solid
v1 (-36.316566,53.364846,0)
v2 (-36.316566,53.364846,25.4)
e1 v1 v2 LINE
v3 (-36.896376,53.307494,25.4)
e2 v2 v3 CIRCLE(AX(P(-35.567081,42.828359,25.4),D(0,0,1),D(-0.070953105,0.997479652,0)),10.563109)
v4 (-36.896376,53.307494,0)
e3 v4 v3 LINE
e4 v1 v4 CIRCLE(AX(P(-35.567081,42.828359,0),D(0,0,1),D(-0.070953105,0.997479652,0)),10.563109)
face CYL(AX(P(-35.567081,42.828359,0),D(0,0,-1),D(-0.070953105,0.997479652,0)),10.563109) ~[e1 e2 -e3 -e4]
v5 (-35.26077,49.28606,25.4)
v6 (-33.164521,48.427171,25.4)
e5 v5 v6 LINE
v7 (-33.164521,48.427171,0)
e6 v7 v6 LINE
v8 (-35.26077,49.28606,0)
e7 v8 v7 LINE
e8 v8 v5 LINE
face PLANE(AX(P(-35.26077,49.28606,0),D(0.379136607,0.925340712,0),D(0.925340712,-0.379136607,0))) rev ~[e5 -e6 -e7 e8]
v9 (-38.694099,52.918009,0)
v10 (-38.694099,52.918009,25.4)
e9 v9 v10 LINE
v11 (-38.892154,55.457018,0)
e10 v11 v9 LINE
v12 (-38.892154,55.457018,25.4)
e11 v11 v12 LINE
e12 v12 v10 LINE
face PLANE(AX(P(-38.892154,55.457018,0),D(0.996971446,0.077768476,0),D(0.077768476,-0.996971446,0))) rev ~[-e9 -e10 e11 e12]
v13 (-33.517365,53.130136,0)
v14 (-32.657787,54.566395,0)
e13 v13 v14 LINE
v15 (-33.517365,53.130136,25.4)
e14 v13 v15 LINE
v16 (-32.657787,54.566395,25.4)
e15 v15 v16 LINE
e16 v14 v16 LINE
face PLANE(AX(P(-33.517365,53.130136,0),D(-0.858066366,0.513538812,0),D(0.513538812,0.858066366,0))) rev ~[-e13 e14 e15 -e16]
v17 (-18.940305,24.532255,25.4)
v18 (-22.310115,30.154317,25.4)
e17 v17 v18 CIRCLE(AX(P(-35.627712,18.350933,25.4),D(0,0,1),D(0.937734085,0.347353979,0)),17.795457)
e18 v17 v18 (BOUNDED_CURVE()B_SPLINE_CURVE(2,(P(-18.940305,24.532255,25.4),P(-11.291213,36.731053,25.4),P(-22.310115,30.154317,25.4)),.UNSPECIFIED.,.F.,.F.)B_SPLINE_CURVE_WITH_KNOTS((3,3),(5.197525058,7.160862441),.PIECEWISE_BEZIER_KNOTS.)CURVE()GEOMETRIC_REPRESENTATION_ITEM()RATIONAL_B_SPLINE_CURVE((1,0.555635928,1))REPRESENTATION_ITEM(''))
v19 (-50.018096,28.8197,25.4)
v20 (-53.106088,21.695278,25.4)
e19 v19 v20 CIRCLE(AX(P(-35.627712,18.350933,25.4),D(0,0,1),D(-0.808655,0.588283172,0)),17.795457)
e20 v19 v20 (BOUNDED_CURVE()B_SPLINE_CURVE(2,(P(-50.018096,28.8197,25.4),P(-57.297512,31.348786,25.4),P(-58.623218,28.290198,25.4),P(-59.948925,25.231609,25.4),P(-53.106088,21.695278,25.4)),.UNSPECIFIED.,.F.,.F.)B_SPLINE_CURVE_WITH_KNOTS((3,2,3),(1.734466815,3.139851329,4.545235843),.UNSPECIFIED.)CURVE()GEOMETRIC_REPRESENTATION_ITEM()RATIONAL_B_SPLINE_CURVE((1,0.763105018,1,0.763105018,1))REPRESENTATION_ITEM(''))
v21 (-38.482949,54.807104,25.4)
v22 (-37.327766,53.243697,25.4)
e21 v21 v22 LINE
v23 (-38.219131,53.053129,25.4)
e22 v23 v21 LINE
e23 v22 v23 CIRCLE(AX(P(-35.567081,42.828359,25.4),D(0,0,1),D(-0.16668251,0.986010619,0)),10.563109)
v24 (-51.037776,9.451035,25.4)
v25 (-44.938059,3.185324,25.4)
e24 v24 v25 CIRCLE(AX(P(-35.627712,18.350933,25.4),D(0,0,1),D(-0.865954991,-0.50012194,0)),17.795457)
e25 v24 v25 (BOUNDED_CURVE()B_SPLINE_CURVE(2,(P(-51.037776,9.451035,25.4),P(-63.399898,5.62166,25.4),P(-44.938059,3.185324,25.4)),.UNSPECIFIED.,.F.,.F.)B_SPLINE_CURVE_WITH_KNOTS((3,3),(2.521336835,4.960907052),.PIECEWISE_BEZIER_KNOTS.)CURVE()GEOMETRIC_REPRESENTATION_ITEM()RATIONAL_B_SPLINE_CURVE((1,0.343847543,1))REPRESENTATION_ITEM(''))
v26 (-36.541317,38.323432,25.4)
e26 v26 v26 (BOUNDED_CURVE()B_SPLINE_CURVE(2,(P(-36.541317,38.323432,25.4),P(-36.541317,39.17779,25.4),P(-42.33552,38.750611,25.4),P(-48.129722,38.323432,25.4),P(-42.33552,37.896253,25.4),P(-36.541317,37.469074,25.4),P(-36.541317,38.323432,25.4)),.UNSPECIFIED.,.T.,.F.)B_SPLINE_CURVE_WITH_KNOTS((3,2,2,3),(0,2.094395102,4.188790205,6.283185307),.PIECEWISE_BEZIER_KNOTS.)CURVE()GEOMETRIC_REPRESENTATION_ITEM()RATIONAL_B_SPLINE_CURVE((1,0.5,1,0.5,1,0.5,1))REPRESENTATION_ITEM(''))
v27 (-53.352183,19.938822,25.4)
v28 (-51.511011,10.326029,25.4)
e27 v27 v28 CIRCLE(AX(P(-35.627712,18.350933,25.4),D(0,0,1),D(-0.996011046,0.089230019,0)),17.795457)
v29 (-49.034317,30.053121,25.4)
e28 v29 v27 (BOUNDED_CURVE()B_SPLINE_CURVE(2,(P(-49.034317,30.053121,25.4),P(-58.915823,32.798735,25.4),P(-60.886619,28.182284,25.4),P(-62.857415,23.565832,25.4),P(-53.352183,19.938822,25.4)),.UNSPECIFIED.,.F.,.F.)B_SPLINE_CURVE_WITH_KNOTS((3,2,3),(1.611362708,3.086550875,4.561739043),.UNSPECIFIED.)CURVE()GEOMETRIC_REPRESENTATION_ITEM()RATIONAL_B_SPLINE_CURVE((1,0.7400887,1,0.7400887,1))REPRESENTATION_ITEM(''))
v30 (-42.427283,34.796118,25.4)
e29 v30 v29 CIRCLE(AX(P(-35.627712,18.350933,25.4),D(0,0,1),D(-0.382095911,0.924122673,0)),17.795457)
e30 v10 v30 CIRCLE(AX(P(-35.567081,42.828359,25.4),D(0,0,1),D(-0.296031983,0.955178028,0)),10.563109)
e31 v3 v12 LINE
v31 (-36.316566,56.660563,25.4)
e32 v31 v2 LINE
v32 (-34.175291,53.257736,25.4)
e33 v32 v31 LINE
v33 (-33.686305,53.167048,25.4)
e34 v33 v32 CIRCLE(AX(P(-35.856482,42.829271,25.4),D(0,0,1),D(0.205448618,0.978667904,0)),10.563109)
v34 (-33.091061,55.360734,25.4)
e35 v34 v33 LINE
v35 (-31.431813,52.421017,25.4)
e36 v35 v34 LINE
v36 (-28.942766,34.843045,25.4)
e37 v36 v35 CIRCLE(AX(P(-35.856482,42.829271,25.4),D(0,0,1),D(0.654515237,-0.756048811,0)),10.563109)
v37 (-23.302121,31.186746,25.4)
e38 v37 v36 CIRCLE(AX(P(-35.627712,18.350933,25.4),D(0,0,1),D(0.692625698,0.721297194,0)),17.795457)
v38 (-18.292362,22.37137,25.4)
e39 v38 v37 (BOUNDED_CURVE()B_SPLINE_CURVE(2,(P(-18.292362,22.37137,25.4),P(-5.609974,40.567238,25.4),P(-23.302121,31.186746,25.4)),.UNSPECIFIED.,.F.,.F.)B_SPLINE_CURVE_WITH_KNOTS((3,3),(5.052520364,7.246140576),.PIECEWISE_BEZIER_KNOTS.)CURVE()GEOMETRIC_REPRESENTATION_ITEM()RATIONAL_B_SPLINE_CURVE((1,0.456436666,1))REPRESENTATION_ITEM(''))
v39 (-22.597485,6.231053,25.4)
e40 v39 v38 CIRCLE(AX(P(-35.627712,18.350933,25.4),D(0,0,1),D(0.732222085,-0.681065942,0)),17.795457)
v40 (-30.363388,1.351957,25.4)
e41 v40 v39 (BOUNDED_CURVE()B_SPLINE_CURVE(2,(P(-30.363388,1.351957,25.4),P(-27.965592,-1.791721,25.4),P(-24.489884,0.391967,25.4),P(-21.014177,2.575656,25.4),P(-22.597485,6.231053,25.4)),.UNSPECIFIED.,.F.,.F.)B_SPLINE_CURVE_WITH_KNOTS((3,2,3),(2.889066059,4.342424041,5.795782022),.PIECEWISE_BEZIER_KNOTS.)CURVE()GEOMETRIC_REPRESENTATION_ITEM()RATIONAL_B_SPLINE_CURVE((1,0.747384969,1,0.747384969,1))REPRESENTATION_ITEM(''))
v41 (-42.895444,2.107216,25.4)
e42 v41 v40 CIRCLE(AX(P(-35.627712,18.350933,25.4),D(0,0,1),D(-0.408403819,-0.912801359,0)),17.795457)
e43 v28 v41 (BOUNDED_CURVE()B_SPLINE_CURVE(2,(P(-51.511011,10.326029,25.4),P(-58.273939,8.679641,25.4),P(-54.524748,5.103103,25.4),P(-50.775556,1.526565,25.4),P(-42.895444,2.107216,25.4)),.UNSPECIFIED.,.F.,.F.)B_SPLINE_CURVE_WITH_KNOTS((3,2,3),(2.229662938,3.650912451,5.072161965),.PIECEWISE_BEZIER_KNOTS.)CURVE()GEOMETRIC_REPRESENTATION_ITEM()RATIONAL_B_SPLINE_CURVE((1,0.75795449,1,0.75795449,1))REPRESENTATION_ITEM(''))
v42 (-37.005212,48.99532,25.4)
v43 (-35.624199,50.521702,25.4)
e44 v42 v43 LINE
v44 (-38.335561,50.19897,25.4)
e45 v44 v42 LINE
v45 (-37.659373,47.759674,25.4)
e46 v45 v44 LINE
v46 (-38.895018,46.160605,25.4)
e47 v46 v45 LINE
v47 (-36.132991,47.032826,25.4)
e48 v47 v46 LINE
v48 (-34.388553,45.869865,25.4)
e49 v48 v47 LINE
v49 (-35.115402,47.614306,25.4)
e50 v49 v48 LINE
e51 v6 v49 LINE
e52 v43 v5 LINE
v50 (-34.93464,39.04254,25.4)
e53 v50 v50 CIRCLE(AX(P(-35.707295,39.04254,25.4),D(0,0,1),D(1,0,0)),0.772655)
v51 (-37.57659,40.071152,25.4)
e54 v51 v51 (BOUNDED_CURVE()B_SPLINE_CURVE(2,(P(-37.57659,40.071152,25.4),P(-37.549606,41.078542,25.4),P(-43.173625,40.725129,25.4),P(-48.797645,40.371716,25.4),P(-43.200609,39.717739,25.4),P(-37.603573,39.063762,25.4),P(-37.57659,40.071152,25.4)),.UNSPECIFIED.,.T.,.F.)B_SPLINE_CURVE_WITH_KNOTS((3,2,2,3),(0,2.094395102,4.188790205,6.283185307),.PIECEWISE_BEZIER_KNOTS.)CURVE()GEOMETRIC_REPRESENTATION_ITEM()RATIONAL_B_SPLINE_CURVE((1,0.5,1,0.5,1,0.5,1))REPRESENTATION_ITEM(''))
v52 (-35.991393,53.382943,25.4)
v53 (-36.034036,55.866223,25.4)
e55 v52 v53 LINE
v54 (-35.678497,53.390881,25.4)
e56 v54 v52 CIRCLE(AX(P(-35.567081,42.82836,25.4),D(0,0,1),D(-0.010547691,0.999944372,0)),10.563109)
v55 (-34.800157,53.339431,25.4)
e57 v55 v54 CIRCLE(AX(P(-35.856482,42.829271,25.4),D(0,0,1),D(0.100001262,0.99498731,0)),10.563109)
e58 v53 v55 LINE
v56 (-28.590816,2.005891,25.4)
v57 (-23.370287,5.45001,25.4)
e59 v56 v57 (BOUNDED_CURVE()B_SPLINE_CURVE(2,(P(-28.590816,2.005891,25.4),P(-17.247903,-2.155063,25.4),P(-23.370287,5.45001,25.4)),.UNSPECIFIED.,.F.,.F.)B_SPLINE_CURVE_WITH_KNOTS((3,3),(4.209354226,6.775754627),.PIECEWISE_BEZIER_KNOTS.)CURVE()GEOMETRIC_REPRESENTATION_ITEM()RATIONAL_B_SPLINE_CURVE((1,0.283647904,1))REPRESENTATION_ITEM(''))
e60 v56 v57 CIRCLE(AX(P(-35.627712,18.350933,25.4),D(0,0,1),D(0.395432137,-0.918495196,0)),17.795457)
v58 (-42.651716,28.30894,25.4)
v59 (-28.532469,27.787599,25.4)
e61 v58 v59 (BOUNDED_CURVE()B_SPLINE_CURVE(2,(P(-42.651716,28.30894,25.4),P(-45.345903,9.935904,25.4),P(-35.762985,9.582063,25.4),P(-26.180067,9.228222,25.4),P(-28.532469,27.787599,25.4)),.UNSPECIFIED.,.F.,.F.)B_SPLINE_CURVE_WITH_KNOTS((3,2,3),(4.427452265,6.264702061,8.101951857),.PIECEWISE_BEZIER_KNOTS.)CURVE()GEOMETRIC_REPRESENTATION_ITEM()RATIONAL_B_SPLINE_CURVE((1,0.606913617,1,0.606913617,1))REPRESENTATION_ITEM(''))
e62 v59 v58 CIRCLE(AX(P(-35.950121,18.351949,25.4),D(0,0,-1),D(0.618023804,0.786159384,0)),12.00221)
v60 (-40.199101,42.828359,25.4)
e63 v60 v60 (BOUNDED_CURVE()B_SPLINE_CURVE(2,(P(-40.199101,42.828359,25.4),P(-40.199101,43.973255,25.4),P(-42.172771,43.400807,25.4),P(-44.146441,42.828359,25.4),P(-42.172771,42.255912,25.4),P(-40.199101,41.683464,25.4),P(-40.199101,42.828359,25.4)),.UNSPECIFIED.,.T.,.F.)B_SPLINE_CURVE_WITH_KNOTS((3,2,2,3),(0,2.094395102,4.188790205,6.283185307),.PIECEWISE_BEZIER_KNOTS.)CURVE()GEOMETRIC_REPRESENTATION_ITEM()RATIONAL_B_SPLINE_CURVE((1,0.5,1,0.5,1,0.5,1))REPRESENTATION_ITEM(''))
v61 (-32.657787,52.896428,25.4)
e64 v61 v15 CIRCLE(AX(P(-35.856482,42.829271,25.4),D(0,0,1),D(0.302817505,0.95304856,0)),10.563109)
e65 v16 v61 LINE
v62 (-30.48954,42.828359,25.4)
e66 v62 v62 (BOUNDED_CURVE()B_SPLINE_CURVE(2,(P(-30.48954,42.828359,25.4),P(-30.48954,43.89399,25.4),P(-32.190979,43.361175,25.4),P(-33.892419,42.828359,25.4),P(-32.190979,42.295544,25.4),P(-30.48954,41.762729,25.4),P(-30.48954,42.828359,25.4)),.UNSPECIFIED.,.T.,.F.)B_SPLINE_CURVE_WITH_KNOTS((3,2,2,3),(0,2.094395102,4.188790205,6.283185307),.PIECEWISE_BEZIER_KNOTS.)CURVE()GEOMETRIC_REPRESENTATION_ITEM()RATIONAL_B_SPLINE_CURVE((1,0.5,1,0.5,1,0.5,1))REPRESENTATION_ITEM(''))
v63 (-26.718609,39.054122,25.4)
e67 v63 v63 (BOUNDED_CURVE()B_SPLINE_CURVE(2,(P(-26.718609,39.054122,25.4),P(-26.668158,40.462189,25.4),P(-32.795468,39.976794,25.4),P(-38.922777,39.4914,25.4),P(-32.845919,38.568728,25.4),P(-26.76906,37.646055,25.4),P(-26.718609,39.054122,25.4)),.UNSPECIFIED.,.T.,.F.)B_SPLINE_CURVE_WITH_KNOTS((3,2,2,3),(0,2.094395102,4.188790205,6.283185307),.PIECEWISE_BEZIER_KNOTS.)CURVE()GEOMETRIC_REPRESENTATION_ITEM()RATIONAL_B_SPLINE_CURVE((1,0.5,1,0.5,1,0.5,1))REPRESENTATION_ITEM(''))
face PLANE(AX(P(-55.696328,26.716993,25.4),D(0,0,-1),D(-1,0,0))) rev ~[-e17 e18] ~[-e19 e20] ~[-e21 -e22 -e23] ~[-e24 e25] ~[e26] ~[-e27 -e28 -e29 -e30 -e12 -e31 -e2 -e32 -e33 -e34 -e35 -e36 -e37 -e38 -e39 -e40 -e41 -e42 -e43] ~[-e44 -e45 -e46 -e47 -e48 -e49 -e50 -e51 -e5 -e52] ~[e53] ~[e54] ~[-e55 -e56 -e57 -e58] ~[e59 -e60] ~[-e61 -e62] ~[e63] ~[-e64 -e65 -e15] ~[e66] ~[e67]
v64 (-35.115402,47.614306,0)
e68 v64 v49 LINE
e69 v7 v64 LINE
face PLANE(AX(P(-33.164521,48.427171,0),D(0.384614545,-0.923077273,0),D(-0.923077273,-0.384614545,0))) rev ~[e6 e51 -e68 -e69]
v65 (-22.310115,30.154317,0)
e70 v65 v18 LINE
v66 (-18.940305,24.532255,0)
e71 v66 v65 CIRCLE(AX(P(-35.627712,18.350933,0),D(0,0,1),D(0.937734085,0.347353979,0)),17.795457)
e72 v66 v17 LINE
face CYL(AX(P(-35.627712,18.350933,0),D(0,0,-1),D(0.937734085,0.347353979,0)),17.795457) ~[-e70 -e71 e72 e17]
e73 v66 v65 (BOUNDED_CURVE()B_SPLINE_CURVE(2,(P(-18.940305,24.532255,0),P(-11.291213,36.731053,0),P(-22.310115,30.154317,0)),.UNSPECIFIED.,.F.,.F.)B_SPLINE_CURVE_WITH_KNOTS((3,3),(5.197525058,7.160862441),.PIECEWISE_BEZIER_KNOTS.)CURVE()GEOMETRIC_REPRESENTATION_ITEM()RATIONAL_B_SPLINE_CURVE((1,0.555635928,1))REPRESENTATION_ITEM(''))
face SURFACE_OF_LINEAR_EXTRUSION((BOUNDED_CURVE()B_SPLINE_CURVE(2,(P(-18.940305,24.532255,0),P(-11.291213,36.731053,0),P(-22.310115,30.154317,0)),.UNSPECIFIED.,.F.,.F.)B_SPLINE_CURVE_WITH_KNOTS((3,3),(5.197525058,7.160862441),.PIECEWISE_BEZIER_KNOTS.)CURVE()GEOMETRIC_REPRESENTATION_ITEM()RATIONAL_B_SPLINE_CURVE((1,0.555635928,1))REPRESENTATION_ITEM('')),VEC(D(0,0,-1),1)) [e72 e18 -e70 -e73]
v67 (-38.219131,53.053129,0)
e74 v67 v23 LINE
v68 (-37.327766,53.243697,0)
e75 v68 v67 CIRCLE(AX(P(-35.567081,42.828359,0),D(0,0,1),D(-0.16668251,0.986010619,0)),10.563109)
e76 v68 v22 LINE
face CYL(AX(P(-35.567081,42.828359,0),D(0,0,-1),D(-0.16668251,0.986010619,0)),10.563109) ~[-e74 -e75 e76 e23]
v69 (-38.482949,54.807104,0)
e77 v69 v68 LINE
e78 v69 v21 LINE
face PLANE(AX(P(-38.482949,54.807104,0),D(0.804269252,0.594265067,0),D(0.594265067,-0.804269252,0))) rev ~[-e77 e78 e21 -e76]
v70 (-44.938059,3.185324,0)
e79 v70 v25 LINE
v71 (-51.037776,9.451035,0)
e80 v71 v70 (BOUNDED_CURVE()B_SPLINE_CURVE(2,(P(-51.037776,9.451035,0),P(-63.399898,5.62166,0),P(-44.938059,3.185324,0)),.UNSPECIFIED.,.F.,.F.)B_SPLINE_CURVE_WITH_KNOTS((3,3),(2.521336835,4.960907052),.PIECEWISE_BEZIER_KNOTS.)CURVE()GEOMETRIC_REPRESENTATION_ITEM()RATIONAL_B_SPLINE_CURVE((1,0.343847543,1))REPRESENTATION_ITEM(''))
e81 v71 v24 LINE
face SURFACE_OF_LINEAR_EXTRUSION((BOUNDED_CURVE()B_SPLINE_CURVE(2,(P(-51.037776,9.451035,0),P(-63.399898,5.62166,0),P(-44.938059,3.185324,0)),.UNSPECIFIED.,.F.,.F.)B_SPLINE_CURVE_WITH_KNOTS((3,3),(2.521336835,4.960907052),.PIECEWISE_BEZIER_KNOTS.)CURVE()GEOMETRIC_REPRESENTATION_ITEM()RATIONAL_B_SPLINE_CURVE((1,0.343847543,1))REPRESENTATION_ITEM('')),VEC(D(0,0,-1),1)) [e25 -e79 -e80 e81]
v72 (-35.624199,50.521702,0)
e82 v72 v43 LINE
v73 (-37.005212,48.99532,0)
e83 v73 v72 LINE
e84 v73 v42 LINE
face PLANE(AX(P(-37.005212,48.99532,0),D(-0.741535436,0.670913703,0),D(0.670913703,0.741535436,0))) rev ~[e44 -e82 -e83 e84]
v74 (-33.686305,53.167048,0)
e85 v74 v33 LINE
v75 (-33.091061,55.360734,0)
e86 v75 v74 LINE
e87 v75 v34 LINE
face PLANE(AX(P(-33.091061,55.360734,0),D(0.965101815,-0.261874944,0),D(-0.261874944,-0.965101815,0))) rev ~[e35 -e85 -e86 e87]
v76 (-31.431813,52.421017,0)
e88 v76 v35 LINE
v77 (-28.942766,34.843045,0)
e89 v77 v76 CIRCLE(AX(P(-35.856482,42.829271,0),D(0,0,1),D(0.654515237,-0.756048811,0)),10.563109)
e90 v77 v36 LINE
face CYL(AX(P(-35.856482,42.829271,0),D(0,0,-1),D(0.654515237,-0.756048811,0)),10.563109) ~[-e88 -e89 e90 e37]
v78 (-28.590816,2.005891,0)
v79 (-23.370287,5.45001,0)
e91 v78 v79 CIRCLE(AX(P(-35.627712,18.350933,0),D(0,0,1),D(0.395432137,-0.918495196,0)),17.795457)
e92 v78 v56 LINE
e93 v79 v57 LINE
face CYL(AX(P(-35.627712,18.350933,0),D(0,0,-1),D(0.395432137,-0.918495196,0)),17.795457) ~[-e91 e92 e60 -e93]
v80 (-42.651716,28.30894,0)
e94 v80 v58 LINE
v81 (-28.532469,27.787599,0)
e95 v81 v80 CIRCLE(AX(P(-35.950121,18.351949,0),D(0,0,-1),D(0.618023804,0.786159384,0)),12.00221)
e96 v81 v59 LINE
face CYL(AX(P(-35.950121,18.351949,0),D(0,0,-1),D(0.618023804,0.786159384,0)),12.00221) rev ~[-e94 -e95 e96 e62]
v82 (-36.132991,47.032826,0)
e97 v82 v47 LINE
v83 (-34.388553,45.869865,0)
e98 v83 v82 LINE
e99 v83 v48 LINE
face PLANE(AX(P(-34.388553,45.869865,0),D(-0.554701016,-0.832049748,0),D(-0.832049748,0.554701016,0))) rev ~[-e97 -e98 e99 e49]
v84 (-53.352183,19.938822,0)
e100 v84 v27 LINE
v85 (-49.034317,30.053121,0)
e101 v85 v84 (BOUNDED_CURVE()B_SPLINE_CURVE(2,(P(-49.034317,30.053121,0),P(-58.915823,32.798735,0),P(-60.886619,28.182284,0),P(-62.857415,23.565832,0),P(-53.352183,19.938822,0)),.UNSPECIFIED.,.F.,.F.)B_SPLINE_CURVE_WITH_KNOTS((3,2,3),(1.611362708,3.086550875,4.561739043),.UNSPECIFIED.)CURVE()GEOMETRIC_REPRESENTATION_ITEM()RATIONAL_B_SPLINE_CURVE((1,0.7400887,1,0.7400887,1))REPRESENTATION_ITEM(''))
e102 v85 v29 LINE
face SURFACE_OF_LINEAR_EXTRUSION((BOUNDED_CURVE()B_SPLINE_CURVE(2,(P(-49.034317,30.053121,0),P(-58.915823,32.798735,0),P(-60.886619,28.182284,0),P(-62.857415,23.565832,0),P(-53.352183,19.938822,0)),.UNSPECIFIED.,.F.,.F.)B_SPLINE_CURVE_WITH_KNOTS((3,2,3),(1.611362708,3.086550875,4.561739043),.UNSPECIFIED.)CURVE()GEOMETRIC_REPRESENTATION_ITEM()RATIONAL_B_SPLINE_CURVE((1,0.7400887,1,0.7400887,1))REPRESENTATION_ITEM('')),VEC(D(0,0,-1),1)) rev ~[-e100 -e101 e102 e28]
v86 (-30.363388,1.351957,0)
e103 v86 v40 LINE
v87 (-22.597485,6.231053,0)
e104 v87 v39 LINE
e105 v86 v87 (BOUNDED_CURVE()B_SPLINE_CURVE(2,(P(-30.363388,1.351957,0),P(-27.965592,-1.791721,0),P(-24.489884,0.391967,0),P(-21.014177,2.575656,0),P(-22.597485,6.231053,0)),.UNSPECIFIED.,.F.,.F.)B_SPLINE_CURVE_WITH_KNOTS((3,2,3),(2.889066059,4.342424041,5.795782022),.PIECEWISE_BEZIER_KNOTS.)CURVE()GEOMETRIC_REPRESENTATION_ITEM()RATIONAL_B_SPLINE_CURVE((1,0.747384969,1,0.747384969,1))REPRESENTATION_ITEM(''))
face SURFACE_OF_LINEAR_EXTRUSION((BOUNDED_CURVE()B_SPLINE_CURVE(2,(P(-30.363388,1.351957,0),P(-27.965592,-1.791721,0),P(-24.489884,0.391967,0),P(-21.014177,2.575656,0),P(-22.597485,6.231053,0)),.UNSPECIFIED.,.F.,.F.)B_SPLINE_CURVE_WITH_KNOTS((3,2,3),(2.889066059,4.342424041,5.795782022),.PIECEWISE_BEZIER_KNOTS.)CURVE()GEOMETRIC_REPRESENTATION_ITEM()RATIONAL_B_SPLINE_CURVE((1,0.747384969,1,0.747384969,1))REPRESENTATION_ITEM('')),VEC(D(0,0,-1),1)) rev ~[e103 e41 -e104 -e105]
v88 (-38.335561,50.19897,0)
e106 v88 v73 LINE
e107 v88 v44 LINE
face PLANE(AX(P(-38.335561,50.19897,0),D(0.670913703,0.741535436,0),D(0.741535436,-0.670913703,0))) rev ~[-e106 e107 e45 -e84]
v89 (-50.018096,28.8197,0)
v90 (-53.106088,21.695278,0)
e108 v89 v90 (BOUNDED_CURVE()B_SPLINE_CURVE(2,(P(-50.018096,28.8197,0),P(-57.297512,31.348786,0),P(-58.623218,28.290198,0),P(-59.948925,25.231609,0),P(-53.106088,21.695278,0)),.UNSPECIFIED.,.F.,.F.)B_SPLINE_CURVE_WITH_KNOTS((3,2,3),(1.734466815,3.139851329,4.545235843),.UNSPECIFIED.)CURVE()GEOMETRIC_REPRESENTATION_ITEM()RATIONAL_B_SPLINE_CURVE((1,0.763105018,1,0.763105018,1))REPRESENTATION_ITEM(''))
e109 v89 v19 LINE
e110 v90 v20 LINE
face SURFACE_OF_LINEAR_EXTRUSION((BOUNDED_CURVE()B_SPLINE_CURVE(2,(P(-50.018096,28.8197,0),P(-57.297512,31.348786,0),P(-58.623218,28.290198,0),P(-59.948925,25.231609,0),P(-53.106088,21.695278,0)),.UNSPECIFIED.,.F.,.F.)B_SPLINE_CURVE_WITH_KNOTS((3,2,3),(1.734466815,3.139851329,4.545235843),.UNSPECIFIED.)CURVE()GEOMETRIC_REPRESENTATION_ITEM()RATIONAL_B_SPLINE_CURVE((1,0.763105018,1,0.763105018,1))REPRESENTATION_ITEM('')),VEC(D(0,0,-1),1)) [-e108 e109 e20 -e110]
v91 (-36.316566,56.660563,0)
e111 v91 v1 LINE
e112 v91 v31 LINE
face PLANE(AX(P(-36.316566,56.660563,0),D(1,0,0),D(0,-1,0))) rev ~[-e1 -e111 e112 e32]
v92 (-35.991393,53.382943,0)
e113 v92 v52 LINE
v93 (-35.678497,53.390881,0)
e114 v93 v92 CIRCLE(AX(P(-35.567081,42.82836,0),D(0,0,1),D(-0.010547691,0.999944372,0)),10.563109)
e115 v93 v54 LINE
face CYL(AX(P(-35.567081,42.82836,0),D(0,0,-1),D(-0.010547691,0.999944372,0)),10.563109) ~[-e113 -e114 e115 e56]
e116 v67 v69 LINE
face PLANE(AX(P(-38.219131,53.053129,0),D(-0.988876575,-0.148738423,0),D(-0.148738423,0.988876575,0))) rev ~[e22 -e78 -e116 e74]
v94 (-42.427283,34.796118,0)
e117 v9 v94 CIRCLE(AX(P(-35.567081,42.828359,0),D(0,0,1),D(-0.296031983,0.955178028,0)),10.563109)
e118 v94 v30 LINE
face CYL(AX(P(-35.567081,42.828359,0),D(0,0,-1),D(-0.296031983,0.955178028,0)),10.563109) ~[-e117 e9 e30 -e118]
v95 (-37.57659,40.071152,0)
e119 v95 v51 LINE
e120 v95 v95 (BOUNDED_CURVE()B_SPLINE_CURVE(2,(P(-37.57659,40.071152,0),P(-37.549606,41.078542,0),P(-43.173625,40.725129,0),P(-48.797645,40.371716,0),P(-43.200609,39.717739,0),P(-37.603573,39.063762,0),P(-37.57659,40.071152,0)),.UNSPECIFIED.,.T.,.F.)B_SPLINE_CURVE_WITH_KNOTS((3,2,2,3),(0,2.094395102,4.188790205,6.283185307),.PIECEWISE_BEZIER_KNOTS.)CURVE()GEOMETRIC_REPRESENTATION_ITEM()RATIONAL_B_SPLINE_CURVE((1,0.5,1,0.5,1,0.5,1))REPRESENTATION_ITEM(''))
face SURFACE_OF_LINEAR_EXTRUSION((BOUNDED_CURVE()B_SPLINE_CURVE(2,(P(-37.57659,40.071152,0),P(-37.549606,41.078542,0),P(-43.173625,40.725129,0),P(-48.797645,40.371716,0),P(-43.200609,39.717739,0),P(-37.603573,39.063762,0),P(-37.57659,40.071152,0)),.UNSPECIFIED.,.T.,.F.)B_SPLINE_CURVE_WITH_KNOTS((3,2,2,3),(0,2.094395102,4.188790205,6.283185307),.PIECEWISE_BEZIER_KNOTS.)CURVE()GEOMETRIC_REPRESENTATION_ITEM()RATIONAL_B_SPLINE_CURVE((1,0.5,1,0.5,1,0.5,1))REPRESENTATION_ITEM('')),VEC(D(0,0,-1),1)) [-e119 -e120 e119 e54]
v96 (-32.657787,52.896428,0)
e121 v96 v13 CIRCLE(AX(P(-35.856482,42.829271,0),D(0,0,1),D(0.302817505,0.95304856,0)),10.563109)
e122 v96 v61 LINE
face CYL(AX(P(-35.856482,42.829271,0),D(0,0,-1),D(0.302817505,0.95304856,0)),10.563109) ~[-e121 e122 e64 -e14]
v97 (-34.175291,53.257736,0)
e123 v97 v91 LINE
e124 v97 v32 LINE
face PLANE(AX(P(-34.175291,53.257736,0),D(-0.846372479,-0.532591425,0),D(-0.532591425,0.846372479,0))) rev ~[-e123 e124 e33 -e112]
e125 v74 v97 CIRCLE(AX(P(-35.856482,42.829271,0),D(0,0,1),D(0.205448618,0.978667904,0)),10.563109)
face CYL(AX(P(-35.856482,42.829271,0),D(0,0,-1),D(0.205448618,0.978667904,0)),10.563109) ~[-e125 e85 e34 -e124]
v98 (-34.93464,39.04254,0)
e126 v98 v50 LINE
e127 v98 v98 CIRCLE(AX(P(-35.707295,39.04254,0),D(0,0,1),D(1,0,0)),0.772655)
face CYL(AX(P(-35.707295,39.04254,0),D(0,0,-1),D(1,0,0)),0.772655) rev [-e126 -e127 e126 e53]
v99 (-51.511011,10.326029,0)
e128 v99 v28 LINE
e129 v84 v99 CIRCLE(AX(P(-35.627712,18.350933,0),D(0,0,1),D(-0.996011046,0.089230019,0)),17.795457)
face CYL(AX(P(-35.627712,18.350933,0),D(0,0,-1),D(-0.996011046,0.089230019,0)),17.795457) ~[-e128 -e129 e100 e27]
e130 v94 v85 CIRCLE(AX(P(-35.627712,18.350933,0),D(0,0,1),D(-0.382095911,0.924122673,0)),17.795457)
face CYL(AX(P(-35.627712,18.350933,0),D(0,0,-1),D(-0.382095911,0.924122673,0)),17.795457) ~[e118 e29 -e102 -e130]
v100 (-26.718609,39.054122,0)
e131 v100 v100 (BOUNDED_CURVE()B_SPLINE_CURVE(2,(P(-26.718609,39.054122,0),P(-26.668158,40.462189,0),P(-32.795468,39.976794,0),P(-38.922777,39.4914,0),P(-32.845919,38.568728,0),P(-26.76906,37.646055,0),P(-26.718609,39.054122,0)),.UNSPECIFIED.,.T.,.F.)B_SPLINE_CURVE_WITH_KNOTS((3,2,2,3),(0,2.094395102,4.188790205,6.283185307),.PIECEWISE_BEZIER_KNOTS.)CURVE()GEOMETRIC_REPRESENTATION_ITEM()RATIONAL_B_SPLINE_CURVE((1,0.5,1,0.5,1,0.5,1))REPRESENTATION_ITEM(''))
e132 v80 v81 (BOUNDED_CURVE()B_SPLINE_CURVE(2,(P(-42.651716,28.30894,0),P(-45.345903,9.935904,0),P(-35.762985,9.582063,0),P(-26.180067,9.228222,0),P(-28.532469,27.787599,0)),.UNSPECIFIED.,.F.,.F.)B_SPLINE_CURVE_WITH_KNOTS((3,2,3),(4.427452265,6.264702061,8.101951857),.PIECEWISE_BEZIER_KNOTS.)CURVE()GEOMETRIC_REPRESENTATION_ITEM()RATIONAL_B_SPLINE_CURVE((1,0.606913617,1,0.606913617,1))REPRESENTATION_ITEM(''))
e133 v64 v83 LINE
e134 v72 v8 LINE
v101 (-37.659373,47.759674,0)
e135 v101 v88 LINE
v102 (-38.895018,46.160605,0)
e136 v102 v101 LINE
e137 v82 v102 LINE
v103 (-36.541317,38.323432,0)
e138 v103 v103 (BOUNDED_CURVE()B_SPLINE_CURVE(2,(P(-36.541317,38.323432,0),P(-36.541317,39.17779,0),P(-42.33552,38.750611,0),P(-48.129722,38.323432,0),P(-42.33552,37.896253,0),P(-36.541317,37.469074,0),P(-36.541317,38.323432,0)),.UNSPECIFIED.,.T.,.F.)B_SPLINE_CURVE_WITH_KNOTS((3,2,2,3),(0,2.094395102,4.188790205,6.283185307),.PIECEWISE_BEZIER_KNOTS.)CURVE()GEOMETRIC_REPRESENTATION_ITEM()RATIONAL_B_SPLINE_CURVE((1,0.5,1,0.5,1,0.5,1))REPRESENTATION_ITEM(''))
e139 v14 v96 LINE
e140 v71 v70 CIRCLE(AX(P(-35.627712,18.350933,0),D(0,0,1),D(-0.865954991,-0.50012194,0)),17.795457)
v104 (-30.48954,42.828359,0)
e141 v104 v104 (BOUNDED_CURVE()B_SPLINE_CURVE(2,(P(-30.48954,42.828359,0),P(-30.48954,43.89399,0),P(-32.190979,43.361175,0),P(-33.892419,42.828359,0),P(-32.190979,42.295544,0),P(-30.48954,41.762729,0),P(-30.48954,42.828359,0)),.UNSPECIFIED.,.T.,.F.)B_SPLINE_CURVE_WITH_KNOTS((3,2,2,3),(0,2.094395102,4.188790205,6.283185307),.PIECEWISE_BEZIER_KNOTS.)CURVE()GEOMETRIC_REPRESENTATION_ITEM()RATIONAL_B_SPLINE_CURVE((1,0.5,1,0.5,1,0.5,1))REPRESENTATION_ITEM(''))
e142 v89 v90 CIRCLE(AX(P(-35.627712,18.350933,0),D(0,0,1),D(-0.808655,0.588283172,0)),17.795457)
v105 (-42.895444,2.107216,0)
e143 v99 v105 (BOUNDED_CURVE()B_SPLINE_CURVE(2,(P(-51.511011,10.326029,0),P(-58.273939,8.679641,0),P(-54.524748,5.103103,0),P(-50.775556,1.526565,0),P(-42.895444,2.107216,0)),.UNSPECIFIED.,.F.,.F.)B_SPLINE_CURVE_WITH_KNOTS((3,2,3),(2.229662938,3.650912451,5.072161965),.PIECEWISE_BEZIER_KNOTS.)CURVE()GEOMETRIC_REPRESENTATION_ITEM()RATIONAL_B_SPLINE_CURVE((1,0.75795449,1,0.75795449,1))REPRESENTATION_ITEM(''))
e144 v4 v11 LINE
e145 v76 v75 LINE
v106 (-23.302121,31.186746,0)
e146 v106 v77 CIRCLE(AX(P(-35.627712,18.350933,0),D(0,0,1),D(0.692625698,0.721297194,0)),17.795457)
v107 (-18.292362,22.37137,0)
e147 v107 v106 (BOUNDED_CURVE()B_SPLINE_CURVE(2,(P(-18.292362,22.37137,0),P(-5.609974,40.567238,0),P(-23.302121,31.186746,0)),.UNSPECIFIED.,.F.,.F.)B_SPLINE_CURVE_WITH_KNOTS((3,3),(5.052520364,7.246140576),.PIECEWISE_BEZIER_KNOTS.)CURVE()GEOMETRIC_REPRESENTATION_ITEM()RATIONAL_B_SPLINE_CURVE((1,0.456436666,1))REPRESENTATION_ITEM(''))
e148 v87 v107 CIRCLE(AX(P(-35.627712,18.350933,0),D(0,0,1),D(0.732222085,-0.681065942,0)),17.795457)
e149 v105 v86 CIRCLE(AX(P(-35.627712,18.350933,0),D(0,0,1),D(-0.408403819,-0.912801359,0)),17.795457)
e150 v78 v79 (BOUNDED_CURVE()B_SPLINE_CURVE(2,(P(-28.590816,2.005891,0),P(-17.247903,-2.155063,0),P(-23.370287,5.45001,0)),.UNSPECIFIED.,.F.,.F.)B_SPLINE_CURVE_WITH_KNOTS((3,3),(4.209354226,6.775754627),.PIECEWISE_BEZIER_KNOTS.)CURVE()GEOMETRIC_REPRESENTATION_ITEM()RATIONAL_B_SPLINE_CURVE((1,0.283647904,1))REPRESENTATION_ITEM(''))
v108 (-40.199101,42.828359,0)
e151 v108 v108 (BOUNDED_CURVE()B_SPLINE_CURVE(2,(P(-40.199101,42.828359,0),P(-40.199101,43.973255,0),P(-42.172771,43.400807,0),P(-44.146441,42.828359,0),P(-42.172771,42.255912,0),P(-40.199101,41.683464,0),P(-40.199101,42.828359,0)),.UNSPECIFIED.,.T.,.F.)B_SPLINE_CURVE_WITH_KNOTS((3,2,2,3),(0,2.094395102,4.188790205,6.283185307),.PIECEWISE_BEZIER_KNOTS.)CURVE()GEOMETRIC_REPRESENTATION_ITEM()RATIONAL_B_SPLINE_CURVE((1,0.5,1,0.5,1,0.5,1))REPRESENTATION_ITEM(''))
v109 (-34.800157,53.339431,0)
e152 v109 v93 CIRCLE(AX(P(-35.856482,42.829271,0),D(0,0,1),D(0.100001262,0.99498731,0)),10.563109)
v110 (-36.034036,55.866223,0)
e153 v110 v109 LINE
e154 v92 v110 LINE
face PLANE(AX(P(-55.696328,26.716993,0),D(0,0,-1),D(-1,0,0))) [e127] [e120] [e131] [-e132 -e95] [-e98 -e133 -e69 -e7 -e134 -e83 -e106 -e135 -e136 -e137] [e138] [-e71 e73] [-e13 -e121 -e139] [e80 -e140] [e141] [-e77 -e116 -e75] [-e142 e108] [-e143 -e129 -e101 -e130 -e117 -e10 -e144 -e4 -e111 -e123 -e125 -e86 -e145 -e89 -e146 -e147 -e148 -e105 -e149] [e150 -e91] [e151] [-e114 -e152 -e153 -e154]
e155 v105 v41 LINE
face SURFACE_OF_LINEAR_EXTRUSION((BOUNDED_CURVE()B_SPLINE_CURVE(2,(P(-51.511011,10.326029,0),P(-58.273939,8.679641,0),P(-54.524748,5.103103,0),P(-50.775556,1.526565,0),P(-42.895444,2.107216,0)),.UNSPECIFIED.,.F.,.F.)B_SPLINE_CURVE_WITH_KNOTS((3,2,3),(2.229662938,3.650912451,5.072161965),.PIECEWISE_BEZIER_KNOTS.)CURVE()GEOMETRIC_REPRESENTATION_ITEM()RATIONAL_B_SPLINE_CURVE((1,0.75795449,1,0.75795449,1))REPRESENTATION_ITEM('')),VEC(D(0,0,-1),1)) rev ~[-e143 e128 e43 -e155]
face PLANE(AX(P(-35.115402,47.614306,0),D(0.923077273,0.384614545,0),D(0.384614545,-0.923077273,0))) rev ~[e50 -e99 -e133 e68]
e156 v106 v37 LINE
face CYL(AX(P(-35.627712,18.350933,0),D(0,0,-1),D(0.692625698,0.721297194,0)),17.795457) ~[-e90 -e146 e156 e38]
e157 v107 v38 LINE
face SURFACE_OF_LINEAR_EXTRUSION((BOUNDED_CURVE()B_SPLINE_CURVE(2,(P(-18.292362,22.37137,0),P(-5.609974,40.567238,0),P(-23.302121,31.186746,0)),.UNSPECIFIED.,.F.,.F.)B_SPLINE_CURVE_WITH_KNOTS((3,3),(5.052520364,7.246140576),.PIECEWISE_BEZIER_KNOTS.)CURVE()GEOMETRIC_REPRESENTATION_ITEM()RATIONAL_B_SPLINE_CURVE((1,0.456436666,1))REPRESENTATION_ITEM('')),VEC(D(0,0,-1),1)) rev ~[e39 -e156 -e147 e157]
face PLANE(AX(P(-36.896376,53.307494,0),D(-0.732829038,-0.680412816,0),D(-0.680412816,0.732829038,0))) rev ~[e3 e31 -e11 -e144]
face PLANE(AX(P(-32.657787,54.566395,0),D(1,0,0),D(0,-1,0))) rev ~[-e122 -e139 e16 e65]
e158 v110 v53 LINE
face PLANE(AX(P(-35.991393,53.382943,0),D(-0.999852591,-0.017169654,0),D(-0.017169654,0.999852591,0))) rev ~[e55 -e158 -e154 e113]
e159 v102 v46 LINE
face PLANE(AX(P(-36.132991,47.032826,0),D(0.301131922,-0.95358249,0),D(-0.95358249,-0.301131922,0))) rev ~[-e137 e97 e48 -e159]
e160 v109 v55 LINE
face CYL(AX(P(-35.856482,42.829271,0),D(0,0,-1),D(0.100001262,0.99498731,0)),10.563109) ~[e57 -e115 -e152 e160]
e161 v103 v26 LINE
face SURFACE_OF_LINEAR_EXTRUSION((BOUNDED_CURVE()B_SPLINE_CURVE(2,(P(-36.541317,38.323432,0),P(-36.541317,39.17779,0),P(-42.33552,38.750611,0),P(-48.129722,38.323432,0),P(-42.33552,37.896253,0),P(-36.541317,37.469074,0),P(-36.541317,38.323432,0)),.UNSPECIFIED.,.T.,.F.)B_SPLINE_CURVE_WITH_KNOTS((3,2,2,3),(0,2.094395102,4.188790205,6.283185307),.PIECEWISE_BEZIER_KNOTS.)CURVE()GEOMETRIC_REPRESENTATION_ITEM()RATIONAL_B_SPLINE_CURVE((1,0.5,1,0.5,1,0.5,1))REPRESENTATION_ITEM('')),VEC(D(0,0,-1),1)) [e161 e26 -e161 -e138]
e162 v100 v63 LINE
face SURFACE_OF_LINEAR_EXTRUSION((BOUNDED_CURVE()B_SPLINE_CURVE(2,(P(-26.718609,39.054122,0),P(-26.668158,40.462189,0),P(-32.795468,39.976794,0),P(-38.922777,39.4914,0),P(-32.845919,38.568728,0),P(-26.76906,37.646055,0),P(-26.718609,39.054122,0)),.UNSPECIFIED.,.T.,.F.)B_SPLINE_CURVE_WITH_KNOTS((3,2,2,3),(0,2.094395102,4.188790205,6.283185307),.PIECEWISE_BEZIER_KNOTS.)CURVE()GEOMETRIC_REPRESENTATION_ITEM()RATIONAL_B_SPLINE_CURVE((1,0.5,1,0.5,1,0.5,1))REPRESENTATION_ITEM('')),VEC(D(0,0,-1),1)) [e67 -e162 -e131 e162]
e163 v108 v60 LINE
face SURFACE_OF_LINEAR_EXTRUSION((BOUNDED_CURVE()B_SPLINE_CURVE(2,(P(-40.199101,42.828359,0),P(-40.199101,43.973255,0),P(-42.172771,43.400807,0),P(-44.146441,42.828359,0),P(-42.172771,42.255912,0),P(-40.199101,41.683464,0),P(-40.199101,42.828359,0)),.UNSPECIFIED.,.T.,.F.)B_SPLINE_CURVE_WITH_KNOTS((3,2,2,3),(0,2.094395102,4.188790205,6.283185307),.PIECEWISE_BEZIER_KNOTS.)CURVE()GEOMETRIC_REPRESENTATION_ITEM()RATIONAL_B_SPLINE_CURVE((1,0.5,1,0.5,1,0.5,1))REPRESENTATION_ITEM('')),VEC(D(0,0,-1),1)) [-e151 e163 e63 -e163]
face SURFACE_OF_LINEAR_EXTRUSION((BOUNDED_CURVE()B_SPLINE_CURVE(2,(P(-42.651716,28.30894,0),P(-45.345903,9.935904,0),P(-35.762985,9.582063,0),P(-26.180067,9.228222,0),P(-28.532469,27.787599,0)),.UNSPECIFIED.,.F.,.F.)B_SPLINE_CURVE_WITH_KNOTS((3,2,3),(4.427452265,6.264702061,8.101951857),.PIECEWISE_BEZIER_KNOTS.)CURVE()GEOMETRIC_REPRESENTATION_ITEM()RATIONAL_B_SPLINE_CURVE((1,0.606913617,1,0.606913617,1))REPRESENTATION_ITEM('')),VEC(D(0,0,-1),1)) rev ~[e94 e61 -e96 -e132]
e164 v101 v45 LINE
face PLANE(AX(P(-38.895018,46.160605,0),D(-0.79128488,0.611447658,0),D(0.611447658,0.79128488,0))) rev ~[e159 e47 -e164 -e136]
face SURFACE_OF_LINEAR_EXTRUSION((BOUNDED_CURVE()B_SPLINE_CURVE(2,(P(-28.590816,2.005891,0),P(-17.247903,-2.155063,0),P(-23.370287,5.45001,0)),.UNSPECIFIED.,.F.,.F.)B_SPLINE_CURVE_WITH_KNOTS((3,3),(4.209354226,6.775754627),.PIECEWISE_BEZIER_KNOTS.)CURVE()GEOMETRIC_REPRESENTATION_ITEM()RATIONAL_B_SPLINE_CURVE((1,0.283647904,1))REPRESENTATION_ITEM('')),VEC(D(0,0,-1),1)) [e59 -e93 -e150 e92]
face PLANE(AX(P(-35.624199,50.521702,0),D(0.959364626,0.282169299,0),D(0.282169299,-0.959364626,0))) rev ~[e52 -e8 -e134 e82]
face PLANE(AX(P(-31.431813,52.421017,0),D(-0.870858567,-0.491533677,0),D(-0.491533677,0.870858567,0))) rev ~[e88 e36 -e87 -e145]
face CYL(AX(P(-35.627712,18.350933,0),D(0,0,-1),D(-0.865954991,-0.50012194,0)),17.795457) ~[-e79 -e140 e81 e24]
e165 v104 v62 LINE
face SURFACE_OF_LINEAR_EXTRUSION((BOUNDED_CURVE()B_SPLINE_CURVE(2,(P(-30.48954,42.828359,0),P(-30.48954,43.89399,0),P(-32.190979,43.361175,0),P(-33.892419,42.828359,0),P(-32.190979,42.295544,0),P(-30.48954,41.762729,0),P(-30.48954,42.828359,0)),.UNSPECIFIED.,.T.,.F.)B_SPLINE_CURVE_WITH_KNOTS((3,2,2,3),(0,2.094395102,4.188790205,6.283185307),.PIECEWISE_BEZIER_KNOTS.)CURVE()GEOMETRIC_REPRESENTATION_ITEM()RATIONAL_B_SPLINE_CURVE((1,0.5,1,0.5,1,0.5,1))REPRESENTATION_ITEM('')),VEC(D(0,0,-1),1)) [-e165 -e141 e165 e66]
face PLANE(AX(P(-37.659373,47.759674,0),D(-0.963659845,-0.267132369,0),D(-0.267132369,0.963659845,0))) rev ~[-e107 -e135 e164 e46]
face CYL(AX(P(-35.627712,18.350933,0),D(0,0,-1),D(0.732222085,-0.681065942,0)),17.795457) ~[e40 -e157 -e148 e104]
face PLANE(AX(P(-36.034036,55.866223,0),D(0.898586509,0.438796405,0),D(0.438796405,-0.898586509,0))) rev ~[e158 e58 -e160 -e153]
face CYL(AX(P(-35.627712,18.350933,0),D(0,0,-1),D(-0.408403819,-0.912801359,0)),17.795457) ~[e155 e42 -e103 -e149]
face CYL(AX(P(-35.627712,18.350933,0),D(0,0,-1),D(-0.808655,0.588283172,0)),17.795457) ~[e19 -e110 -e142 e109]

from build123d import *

# Parameters (mm, degrees)
F0_R     = 10.0785054584
F0_R_2   = 0.7726547986
F1_DEPTH = 25.4


# Not quite as in the source:
# - ends of sketch curves that miss each other by under 0.0002 mm in the source are joined


with BuildPart() as f1:
    # F0 (on Top) → F1 (new body)
    with BuildSketch(Plane.XY):
        with BuildLine():
            add(Edge.make_bspline(
                [(-50.0180964614, 28.8197003624), (-57.2975115577, 31.3487862827), (-58.6232181907, 28.2901978298), (-59.9489248237, 25.231609377), (-53.106087556, 21.6952780586)],
                knots=[1.7344668149, 1.7344668149, 1.7344668149, 3.1398513289, 3.1398513289, 4.545235843, 4.545235843, 4.545235843], degree=2, weights=[1, 0.7631050179, 1, 0.7631050179, 1]))
            ThreePointArc((-50.0180964614, 28.8197003624), (-49.5398823331, 29.4473185267), (-49.0343167088, 30.0531210625))
            add(Edge.make_bspline(
                [(-49.0343167088, 30.0531210625), (-58.9158228988, 32.7987351352), (-60.8866187286, 28.1822837461), (-62.8574145584, 23.5658323569), (-53.352182829, 19.9388216781)],
                knots=[1.6113627075, 1.6113627075, 1.6113627075, 3.0865508755, 3.0865508755, 4.5617390434, 4.5617390434, 4.5617390434], degree=2, weights=[1, 0.7400887, 1, 0.7400887, 1]))
            ThreePointArc((-53.352182829, 19.9388216781), (-53.2510312996, 20.8201177091), (-53.106087556, 21.6952780586))
        make_face()
        with BuildLine():
            ThreePointArc((-49.0343167088, 30.0531210625), (-49.5398823331, 29.4473185267), (-50.0180964614, 28.8197003624))
            ThreePointArc((-50.0180964614, 28.8197003624), (-51.9554128243, 25.427969163), (-53.106087556, 21.6952780586))
            ThreePointArc((-53.106087556, 21.6952780586), (-53.2510312996, 20.8201177091), (-53.352182829, 19.9388216781))
            ThreePointArc((-53.352182829, 19.9388216781), (-53.1054689981, 15.0033563173), (-51.5110108292, 10.3260291757))
            ThreePointArc((-51.5110108292, 10.3260291757), (-51.280508632, 9.8852244586), (-51.0377759492, 9.451034516))
            ThreePointArc((-51.0377759492, 9.451034516), (-48.3787694683, 5.9376819562), (-44.9380593764, 3.1853237423))
            ThreePointArc((-44.9380593764, 3.1853237423), (-43.9342610942, 2.613095927), (-42.8954439712, 2.1072158532))
            ThreePointArc((-42.8954439712, 2.1072158532), (-36.6982327212, 0.5877050753), (-30.3633878968, 1.3519572135))
            ThreePointArc((-30.3633878968, 1.3519572135), (-29.4684173588, 1.6553834073), (-28.5908161665, 2.0058914187))
            ThreePointArc((-28.5908161665, 2.0058914187), (-25.8280594304, 3.4968056801), (-23.3702871248, 5.4500095639))
            ThreePointArc((-23.3702871248, 5.4500095639), (-22.977856737, 5.8345656337), (-22.5974852794, 6.2310533816))
            ThreePointArc((-22.5974852794, 6.2310533816), (-18.4333953632, 13.7646746594), (-18.2923616242, 22.3713699526))
            ThreePointArc((-18.2923616242, 22.3713699526), (-18.5820570111, 23.4620905143), (-18.9403054317, 24.5322553755))
            ThreePointArc((-18.9403054317, 24.5322553755), (-20.3641292785, 27.4997757708), (-22.3101148735, 30.1543174841))
            ThreePointArc((-22.3101148735, 30.1543174841), (-22.7957304511, 30.6805123661), (-23.3021210637, 31.1867456034))
            ThreePointArc((-23.3021210637, 31.1867456034), (-25.9482355577, 33.283649081), (-28.9427655928, 34.8430451111))
            ThreePointArc((-28.9427655928, 34.8430451111), (-25.3977045999, 44.3102382619), (-31.4318132237, 52.4210173068))
            ThreePointArc((-31.4318132237, 52.4210173068), (-32.0373954884, 52.6778175418), (-32.6577872038, 52.8964276046))
            ThreePointArc((-32.6577872038, 52.8964276046), (-33.0851112648, 53.0223468137), (-33.517364649, 53.1301360167))
            ThreePointArc((-33.517364649, 53.1301360167), (-33.6017594974, 53.14893749), (-33.6863054157, 53.1670475296))
            ThreePointArc((-33.6863054157, 53.1670475296), (-33.9302645044, 53.2152700375), (-34.1752911752, 53.257736233))
            ThreePointArc((-34.1752911752, 53.257736233), (-34.4871149048, 53.3032446145), (-34.8001573646, 53.3394312076))
            ThreePointArc((-34.8001573646, 53.3394312076), (-35.2387913564, 53.3743052487), (-35.6784971845, 53.3908812059))
            ThreePointArc((-35.6784971845, 53.3908812059), (-35.8349745403, 53.3880712068), (-35.99139309, 53.3829432177))
            ThreePointArc((-35.99139309, 53.3829432177), (-36.1540493789, 53.3751479329), (-36.3165661693, 53.3648461076))
            ThreePointArc((-36.3165661693, 53.3648461076), (-36.6068663985, 53.3401682996), (-36.8963756174, 53.3074937009))
            ThreePointArc((-36.8963756174, 53.3074937009), (-37.1124002353, 53.2778219809), (-37.3277663495, 53.2436974533))
            ThreePointArc((-37.3277663495, 53.2436974533), (-37.7755052177, 53.1580322854), (-38.2191310496, 53.0531288233))
            ThreePointArc((-38.2191310496, 53.0531288233), (-38.457404707, 52.9883450288), (-38.6940989785, 52.9180094213))
            ThreePointArc((-38.6940989785, 52.9180094213), (-45.91294383, 44.9596494894), (-42.4272827417, 34.7961175947))
            ThreePointArc((-42.4272827417, 34.7961175947), (-46.0053988989, 32.8071382816), (-49.0343167088, 30.0531210625))
        make_face()
        with BuildLine():
            ThreePointArc((-40.1754545674, 33.3235095623), (-38.0178952671, 32.5534974638), (-35.7450652159, 32.266749623))
            ThreePointArc((-35.7450652159, 32.266749623), (-33.4705135315, 32.539157888), (-31.3081785908, 33.2955303043))
            ThreePointArc((-31.3081785908, 33.2955303043), (-20.2401657347, 16.065589316), (-35.8379356915, 2.7960246127))
            ThreePointArc((-35.8379356915, 2.7960246127), (-51.3517644926, 16.1636306426), (-40.1754545674, 33.3235095623))
        make_face(mode=Mode.SUBTRACT)
        with Locations((-35.5670807588, 42.828359423)):
            Circle(F0_R, mode=Mode.SUBTRACT)
        with BuildLine():
            ThreePointArc((-51.0377759492, 9.451034516), (-51.280508632, 9.8852244586), (-51.5110108292, 10.3260291757))
            add(Edge.make_bspline(
                [(-51.5110108292, 10.3260291757), (-58.27393887, 8.6796410588), (-54.5247475311, 5.1031028887), (-50.7755561922, 1.5265647186), (-42.8954439712, 2.1072158532)],
                knots=[2.2296629378, 2.2296629378, 2.2296629378, 3.6509124512, 3.6509124512, 5.0721619646, 5.0721619646, 5.0721619646], degree=2, weights=[1, 0.7579544905, 1, 0.7579544905, 1]))
            ThreePointArc((-42.8954439712, 2.1072158532), (-43.9342610942, 2.613095927), (-44.9380593764, 3.1853237423))
            add(Edge.make_bspline(
                [(-51.0377759492, 9.451034516), (-63.3998983234, 5.6216599189), (-44.9380593764, 3.1853237423)],
                knots=[2.5213368346, 2.5213368346, 2.5213368346, 4.9609070517, 4.9609070517, 4.9609070517], degree=2, weights=[1, 0.3438475428, 1]))
        make_face()
        with BuildLine():
            Line((-38.8921536505, 55.4570183158), (-38.6940989785, 52.9180094213))
            ThreePointArc((-38.6940989785, 52.9180094213), (-38.457404707, 52.9883450288), (-38.2191310496, 53.0531288233))
            Line((-38.2191310496, 53.0531288233), (-38.4829491377, 54.8071041703))
            Line((-38.4829491377, 54.8071041703), (-37.3277663495, 53.2436974533))
            ThreePointArc((-37.3277663495, 53.2436974533), (-37.1124002353, 53.2778219809), (-36.8963756174, 53.3074937009))
            Line((-36.8963756174, 53.3074937009), (-38.8921536505, 55.4570183158))
        make_face()
        with BuildLine():
            ThreePointArc((-28.5908161665, 2.0058914187), (-29.4684173588, 1.6553834073), (-30.3633878968, 1.3519572135))
            add(Edge.make_bspline(
                [(-30.3633878968, 1.3519572135), (-27.965591922, -1.791721016), (-24.4898843488, 0.3919673893), (-21.0141767755, 2.5756557946), (-22.5974852794, 6.2310533816)],
                knots=[2.889066059, 2.889066059, 2.889066059, 4.3424240407, 4.3424240407, 5.7957820224, 5.7957820224, 5.7957820224], degree=2, weights=[1, 0.7473849691, 1, 0.7473849691, 1]))
            ThreePointArc((-22.5974852794, 6.2310533816), (-22.977856737, 5.8345656337), (-23.3702871248, 5.4500095639))
            add(Edge.make_bspline(
                [(-28.5908161665, 2.0058914187), (-17.2479026501, -2.1550631546), (-23.3702871248, 5.4500095639)],
                knots=[4.2093542263, 4.2093542263, 4.2093542263, 6.7757546269, 6.7757546269, 6.7757546269], degree=2, weights=[1, 0.283647904, 1]))
        make_face()
        with BuildLine():
            Line((-36.3165661693, 56.6605627537), (-36.3165661693, 53.3648461076))
            ThreePointArc((-36.3165661693, 53.3648461076), (-36.1540493789, 53.3751479329), (-35.99139309, 53.3829432177))
            Line((-35.99139309, 53.3829432177), (-36.0340364277, 55.8662228286))
            Line((-36.0340364277, 55.8662228286), (-34.8001573646, 53.3394312076))
            ThreePointArc((-34.8001573646, 53.3394312076), (-34.4871149048, 53.3032446145), (-34.1752911752, 53.257736233))
            Line((-34.1752911752, 53.257736233), (-36.3165661693, 56.6605627537))
        make_face()
        with BuildLine():
            ThreePointArc((-18.9403054317, 24.5322553755), (-18.5820570111, 23.4620905143), (-18.2923616242, 22.3713699526))
            add(Edge.make_bspline(
                [(-18.2923616242, 22.3713699526), (-5.6099736512, 40.5672382573), (-23.3021210637, 31.1867456034)],
                knots=[5.0525203643, 5.0525203643, 5.0525203643, 7.246140576, 7.246140576, 7.246140576], degree=2, weights=[1, 0.456436666, 1]))
            ThreePointArc((-23.3021210637, 31.1867456034), (-22.7957304511, 30.6805123661), (-22.3101148735, 30.1543174841))
            add(Edge.make_bspline(
                [(-18.9403054317, 24.5322553755), (-11.291213279, 36.7310525289), (-22.3101148735, 30.1543174841)],
                knots=[5.1975250581, 5.1975250581, 5.1975250581, 7.160862441, 7.160862441, 7.160862441], degree=2, weights=[1, 0.555635928, 1]))
        make_face()
        with BuildLine():
            Line((-33.0910608172, 55.3607344627), (-33.6863054157, 53.1670475296))
            ThreePointArc((-33.6863054157, 53.1670475296), (-33.6017594974, 53.14893749), (-33.517364649, 53.1301360167))
            Line((-33.517364649, 53.1301360167), (-32.6577872038, 54.5663945377))
            Line((-32.6577872038, 54.5663945377), (-32.6577872038, 52.8964276046))
            ThreePointArc((-32.6577872038, 52.8964276046), (-32.0373954884, 52.6778175418), (-31.4318132237, 52.4210173068))
            Line((-31.4318132237, 52.4210173068), (-33.0910608172, 55.3607344627))
        make_face()
        with BuildLine():
            ThreePointArc((-31.3081785908, 33.2955303043), (-33.4705135315, 32.539157888), (-35.7450652159, 32.266749623))
            ThreePointArc((-35.7450652159, 32.266749623), (-38.0178952671, 32.5534974638), (-40.1754545674, 33.3235095623))
            ThreePointArc((-40.1754545674, 33.3235095623), (-51.3517644926, 16.1636306426), (-35.8379356915, 2.7960246127))
            ThreePointArc((-35.8379356915, 2.7960246127), (-20.2401657347, 16.065589316), (-31.3081785908, 33.2955303043))
        make_face()
        with BuildLine():
            ThreePointArc((-42.6517156255, 28.3089399398), (-41.2780913199, 29.10675124), (-39.811138088, 29.716172949))
            add(Edge.make_bspline(
                [(-39.811138088, 29.716172949), (-44.2325567375, 13.8247773653), (-35.6994618661, 13.5522226968), (-27.1663669947, 13.2796680283), (-31.3717468344, 29.4466112577)],
                knots=[4.1677682594, 4.1677682594, 4.1677682594, 6.2685150493, 6.2685150493, 8.3692618392, 8.3692618392, 8.3692618392], degree=2, weights=[1, 0.4972471218, 1, 0.4972471218, 1]))
            ThreePointArc((-31.3717468344, 29.4466112577), (-29.8950207475, 28.7148058545), (-28.5324694133, 27.7875987873))
            ThreePointArc((-28.5324694133, 27.7875987873), (-36.3929905001, 6.3579122365), (-42.6517156255, 28.3089399398))
        make_face(mode=Mode.SUBTRACT)
        with BuildLine():
            add(Edge.make_bspline(
                [(-39.811138088, 29.716172949), (-44.2325567375, 13.8247773653), (-35.6994618661, 13.5522226968), (-27.1663669947, 13.2796680283), (-31.3717468344, 29.4466112577)],
                knots=[4.1677682594, 4.1677682594, 4.1677682594, 6.2685150493, 6.2685150493, 8.3692618392, 8.3692618392, 8.3692618392], degree=2, weights=[1, 0.4972471218, 1, 0.4972471218, 1]))
            ThreePointArc((-39.811138088, 29.716172949), (-41.2780913199, 29.10675124), (-42.6517156255, 28.3089399398))
            add(Edge.make_bspline(
                [(-42.6517156255, 28.3089399398), (-45.345902533, 9.9359036694), (-35.7629848612, 9.5820625884), (-26.1800671894, 9.2282215074), (-28.5324694133, 27.7875987873)],
                knots=[4.4274522653, 4.4274522653, 4.4274522653, 6.2647020613, 6.2647020613, 8.1019518573, 8.1019518573, 8.1019518573], degree=2, weights=[1, 0.6069136169, 1, 0.6069136169, 1]))
            ThreePointArc((-28.5324694133, 27.7875987873), (-29.8950207475, 28.7148058545), (-31.3717468344, 29.4466112577))
        make_face()
        with Locations((-35.5670807588, 42.828359423)):
            Circle(F0_R)
        with BuildLine():
            add(Edge.make_bspline(
                [(-36.5413166583, 38.3234322071), (-36.5413166583, 39.1777903129), (-42.3355195671, 38.75061126), (-48.129722476, 38.3234322071), (-42.3355195671, 37.8962531542), (-36.5413166583, 37.4690741013), (-36.5413166583, 38.3234322071)],
                knots=[0, 0, 0, 2.0943951024, 2.0943951024, 4.1887902048, 4.1887902048, 6.2831853072, 6.2831853072, 6.2831853072], degree=2, weights=[1, 0.5, 1, 0.5, 1, 0.5, 1]))
        make_face(mode=Mode.SUBTRACT)
        with BuildLine():
            add(Edge.make_bspline(
                [(-37.5765897334, 40.0711521506), (-37.5496060824, 41.0785421219), (-43.1736253786, 40.7251290722), (-48.7976446748, 40.3717160225), (-43.2006090296, 39.7177391009), (-37.6035733843, 39.0637621794), (-37.5765897334, 40.0711521506)],
                knots=[0, 0, 0, 2.0943951024, 2.0943951024, 4.1887902048, 4.1887902048, 6.2831853072, 6.2831853072, 6.2831853072], degree=2, weights=[1, 0.5, 1, 0.5, 1, 0.5, 1]))
        make_face(mode=Mode.SUBTRACT)
        with BuildLine():
            add(Edge.make_bspline(
                [(-40.1991009712, 42.828359423), (-40.1991009712, 43.9732546132), (-42.1727709472, 43.4008070181), (-44.1464409232, 42.828359423), (-42.1727709472, 42.2559118279), (-40.1991009712, 41.6834642328), (-40.1991009712, 42.828359423)],
                knots=[0, 0, 0, 2.0943951024, 2.0943951024, 4.1887902048, 4.1887902048, 6.2831853072, 6.2831853072, 6.2831853072], degree=2, weights=[1, 0.5, 1, 0.5, 1, 0.5, 1]))
        make_face(mode=Mode.SUBTRACT)
        with Locations((-35.7072949409, 39.0425398946)):
            Circle(F0_R_2, mode=Mode.SUBTRACT)
        with BuildLine():
            add(Edge.make_bspline(
                [(-26.718609035, 39.0541218221), (-26.6681576645, 40.4621885374), (-32.7954675319, 39.97679433), (-38.9227773994, 39.4914001226), (-32.8459189025, 38.5687276147), (-26.7690604056, 37.6460551068), (-26.718609035, 39.0541218221)],
                knots=[0, 0, 0, 2.0943951024, 2.0943951024, 4.1887902048, 4.1887902048, 6.2831853072, 6.2831853072, 6.2831853072], degree=2, weights=[1, 0.5, 1, 0.5, 1, 0.5, 1]))
        make_face(mode=Mode.SUBTRACT)
        Polygon((-37.005212158, 48.9953197539), (-35.6241986156, 50.5217015743), (-35.2607704699, 49.2860600352), (-33.1645212472, 48.4271711887), (-35.1154021919, 47.6143062115), (-34.3885533512, 45.8698645234), (-36.1329913139, 47.0328256488), (-38.8950183988, 46.1606048048), (-37.6593731344, 47.7596744895), (-38.3355605541, 50.1989695397), align=None, mode=Mode.SUBTRACT)
        with BuildLine():
            add(Edge.make_bspline(
                [(-30.4895397276, 42.828359423), (-30.4895397276, 43.8939900952), (-32.1909794584, 43.3611747591), (-33.8924191892, 42.828359423), (-32.1909794584, 42.2955440869), (-30.4895397276, 41.7627287508), (-30.4895397276, 42.828359423)],
                knots=[0, 0, 0, 2.0943951024, 2.0943951024, 4.1887902048, 4.1887902048, 6.2831853072, 6.2831853072, 6.2831853072], degree=2, weights=[1, 0.5, 1, 0.5, 1, 0.5, 1]))
        make_face(mode=Mode.SUBTRACT)
    extrude(amount=F1_DEPTH)


solid = f1.part
